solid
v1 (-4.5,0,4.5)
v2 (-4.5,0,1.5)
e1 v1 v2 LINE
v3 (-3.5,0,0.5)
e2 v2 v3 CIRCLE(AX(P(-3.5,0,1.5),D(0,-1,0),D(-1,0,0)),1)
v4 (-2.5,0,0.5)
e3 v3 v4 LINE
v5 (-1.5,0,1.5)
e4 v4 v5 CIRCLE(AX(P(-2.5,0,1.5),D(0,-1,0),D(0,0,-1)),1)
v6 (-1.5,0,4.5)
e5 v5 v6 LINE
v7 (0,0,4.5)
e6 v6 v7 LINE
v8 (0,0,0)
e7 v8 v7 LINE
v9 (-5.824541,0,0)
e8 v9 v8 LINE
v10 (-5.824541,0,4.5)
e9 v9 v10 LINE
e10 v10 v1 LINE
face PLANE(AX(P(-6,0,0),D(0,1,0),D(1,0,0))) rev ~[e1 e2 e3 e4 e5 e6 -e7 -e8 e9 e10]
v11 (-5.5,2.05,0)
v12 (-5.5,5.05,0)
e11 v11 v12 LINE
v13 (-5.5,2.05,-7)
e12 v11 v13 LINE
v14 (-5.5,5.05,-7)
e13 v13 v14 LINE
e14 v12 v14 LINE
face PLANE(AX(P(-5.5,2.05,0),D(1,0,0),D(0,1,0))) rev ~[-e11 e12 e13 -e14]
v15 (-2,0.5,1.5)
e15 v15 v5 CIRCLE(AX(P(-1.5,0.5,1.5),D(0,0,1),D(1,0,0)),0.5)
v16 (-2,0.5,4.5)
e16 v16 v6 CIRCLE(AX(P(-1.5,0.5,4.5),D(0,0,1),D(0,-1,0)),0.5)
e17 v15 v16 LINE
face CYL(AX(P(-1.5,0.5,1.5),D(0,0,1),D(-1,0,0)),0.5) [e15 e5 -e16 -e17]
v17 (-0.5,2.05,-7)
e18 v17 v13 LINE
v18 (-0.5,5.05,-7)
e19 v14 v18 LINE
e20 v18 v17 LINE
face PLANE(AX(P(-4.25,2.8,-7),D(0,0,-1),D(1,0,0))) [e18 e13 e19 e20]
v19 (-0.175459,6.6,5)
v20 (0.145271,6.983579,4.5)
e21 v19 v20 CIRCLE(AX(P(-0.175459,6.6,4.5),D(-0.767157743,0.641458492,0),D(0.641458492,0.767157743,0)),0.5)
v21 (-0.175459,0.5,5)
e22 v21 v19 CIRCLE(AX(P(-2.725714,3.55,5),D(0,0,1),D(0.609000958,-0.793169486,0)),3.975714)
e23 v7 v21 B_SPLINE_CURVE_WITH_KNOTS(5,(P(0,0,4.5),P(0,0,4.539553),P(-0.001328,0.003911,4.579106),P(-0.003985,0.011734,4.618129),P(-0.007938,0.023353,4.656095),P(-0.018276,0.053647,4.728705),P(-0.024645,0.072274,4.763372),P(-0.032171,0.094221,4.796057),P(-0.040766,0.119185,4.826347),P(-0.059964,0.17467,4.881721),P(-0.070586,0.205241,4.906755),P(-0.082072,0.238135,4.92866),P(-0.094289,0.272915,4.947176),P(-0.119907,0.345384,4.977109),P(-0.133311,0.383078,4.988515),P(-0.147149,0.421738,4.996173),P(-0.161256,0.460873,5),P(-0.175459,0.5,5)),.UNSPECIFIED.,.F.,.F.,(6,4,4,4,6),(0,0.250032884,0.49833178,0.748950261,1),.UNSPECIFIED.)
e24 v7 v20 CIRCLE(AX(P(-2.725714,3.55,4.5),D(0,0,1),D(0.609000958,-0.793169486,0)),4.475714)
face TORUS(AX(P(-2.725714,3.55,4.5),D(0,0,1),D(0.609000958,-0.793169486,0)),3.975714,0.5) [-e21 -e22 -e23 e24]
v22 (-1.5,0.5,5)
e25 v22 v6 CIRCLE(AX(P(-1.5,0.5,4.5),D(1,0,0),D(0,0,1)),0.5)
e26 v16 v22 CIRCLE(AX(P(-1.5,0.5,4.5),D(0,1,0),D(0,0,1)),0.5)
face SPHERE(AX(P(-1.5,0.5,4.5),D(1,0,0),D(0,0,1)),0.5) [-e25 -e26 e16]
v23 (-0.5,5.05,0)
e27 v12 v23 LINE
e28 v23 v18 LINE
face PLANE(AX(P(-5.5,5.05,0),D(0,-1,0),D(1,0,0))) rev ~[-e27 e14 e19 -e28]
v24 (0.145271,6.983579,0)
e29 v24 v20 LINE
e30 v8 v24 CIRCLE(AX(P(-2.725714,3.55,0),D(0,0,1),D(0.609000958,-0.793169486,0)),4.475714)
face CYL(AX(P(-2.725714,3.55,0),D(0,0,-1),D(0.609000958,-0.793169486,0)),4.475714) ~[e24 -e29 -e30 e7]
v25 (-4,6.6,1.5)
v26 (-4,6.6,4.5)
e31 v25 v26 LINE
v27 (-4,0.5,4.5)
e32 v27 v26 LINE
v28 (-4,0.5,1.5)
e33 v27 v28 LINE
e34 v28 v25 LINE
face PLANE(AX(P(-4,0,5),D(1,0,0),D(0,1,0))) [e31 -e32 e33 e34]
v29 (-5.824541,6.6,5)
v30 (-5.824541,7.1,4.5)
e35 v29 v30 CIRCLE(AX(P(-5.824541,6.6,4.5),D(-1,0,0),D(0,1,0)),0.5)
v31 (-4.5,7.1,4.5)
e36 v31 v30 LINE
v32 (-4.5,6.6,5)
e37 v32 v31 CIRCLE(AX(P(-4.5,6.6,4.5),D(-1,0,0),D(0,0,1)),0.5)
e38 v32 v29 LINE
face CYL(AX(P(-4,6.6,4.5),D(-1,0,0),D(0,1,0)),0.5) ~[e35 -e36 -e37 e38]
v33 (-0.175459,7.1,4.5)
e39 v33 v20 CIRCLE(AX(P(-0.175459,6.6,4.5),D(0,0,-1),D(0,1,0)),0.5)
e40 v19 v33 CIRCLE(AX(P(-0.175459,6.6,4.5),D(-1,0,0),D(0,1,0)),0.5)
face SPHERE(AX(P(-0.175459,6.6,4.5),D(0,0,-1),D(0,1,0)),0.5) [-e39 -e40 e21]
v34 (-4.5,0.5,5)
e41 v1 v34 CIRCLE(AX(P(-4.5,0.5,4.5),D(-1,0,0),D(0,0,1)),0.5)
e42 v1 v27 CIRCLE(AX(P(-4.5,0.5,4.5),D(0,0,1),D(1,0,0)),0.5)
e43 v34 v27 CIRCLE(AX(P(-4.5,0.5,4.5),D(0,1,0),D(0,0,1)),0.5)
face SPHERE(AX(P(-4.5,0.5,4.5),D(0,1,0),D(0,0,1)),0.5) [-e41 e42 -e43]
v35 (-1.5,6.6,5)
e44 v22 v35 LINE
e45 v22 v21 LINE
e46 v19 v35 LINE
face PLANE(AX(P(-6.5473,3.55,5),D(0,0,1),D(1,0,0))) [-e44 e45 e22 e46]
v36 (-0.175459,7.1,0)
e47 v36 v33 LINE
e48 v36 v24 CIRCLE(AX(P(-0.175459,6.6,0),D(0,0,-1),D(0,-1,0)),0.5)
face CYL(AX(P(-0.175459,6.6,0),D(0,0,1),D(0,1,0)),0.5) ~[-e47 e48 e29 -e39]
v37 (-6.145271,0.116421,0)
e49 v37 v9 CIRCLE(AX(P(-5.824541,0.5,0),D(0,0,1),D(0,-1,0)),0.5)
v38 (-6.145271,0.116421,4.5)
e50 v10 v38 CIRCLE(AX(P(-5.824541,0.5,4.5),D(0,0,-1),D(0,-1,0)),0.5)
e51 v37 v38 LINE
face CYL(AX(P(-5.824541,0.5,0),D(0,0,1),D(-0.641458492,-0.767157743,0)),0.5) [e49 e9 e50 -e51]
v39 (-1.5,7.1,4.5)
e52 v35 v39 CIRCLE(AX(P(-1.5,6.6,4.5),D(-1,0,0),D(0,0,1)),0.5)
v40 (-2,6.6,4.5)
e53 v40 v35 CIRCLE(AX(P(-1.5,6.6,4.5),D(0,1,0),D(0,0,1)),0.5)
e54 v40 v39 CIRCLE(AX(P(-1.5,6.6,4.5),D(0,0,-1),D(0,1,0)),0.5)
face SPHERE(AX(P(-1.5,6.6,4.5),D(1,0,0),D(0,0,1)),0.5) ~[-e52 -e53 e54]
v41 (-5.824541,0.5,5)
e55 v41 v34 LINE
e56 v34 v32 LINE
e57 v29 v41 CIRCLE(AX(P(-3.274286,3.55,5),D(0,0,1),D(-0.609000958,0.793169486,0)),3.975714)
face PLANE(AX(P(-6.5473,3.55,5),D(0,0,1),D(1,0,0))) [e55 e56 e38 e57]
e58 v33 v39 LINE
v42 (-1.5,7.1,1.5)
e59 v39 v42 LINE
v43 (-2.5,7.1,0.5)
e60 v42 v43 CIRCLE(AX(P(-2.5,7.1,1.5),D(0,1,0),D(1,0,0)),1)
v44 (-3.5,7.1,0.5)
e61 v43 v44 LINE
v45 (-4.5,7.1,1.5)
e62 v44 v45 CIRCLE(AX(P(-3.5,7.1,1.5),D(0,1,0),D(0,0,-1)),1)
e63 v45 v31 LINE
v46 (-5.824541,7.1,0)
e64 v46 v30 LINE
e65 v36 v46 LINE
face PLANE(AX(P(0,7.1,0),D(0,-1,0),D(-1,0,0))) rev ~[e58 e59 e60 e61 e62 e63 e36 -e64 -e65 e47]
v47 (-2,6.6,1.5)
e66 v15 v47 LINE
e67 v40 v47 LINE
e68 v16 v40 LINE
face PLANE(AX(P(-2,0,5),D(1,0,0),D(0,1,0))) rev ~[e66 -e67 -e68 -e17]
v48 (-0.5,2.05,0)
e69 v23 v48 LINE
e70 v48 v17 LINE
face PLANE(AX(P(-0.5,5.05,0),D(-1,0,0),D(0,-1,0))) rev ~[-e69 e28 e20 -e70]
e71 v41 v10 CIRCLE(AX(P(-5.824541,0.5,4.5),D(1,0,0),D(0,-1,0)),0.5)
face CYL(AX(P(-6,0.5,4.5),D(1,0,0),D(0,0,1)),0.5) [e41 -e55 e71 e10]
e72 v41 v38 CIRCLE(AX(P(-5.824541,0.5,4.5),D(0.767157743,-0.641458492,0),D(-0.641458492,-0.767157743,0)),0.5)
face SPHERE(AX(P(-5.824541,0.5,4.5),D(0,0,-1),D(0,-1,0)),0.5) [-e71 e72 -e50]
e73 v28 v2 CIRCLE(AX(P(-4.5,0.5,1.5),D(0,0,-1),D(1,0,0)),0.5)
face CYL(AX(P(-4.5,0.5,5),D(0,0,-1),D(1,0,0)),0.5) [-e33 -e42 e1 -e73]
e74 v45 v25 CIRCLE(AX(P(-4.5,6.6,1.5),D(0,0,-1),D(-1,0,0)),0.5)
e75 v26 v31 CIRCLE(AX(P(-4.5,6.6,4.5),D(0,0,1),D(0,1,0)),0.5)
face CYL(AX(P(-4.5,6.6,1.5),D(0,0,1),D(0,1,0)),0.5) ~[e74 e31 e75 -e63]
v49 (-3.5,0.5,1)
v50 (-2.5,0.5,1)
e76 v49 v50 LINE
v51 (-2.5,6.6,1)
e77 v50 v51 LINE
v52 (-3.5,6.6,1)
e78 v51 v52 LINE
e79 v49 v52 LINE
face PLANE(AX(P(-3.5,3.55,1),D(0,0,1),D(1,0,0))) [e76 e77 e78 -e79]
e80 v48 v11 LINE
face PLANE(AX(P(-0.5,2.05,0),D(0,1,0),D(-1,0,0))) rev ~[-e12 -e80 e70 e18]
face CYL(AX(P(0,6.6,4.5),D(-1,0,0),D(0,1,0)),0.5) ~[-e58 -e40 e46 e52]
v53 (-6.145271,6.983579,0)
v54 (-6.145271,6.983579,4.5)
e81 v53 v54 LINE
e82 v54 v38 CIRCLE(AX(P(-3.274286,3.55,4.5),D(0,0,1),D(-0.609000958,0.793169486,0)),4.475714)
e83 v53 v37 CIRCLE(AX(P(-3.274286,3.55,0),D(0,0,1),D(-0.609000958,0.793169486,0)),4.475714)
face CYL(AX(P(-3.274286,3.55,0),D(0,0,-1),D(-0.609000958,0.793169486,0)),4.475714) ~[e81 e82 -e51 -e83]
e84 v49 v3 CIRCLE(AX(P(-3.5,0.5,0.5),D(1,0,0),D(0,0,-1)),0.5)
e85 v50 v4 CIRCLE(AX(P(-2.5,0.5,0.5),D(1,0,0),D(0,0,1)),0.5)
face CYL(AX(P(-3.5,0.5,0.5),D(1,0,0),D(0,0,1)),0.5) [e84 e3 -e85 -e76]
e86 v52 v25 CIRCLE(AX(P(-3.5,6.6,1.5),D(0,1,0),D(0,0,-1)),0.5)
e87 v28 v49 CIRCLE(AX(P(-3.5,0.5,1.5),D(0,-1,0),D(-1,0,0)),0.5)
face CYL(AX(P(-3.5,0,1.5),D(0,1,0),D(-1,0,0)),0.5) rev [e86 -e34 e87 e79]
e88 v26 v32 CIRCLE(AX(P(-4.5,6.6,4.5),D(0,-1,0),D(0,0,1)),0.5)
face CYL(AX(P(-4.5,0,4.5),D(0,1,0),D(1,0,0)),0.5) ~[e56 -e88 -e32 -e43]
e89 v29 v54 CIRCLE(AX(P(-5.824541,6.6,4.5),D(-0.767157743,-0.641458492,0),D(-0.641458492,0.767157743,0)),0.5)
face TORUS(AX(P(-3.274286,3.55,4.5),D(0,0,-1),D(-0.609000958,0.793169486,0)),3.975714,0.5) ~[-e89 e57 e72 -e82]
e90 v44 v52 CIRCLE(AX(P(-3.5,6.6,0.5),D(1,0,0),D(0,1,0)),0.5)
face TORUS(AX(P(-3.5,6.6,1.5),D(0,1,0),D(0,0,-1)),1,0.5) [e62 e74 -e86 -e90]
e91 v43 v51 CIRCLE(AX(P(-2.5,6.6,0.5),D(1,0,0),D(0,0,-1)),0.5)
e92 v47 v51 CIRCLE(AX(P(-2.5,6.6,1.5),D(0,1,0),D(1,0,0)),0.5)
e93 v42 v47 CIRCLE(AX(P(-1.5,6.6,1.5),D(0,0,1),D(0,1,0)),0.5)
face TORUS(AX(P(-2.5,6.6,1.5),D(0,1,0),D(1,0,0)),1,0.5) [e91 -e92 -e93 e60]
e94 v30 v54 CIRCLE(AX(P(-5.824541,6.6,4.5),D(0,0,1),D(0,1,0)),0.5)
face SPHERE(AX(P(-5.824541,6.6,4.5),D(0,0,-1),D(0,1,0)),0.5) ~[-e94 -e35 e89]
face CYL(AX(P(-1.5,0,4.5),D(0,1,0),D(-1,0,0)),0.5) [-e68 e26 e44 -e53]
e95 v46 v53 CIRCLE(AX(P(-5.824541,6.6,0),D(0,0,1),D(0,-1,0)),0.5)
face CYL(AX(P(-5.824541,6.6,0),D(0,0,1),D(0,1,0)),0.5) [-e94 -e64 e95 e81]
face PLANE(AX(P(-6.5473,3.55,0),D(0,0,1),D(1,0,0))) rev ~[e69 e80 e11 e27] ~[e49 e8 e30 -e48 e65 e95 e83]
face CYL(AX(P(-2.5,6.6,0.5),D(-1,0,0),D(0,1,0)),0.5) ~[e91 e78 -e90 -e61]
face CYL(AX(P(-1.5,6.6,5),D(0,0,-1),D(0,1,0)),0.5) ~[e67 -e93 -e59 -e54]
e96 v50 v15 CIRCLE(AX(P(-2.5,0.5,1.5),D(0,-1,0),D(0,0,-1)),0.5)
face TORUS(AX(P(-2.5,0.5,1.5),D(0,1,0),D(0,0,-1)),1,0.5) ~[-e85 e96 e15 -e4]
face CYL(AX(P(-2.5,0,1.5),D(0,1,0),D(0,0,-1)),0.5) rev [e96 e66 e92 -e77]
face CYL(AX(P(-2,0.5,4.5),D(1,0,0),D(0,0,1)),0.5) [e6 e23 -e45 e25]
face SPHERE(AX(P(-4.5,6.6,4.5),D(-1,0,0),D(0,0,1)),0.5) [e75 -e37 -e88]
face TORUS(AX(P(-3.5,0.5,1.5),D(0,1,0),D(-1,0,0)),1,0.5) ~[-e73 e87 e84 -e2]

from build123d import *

# Parameters (mm, degrees)
F1_DEPTH = 5
F2_W     = 1
F2_H     = 7.1
F3_DEPTH = 4
F4_F1_R  = 0.5
F4_F2_R  = 0.5
F5_W     = 2.5
F5_H     = 1.5
F6_DEPTH = 7


with BuildPart() as f1:
    # F0 (on Top) → F1 (new body)
    with BuildSketch(Plane.XY):
        with BuildLine():
            Line((-6, 0), (-6, 7.1))
            ThreePointArc((-6, 7.1), (-7.75, 3.55), (-6, 0))
        make_face()
        Polygon((-3, 7.1), (-6, 7.1), (-6, 0), (-3, 0), (-3, 3.55), align=None)
        Polygon((0, 7.1), (-3, 7.1), (-3, 3.55), (-3, 0), (0, 0), align=None)
        with BuildLine():
            ThreePointArc((0, 0), (1.75, 3.55), (0, 7.1))
            Line((0, 7.1), (0, 0))
        make_face()
    extrude(amount=F1_DEPTH)

    # F2 (on face) → F3 (cut)
    with BuildSketch(Plane.XY.offset(5)):
        with Locations((-3.5, 3.55)):
            Rectangle(F2_W, F2_H)
        with Locations((-2.5, 3.55)):
            Rectangle(F2_W, F2_H)
    extrude(amount=-F3_DEPTH, mode=Mode.SUBTRACT)

    # F4: fillet of radius 0.5 on 15 edges, made by hand

    # F4_f1
    f4_f1_edges = [f1.edges().sort_by_distance(p)[0] for p in [
        (-4, 3.55, 1),
        (-2, 3.55, 1),
    ]]
    fillet(f4_f1_edges, radius=F4_F1_R)

    # F4_f2
    f4_f2_edges = [f1.edges().sort_by_distance(p)[0] for p in [
        (-5, 7.1, 5),
        (-4, 3.55, 5),
        (-5, 0, 5),
        (-7.75, 3.55, 5),
        (-1, 7.1, 5),
        (1.75, 3.55, 5),
        (-1, 0, 5),
        (-2, 3.55, 5),
        (-3, 0, 1),
        (-3, 7.1, 1),
        (0, 7.1, 2.5),
        (-6, 7.1, 2.5),
        (-6, 0, 2.5),
        (-2.1464466094, 7.1, 1.1464466094),
        (-3.8535533906, 7.1, 1.1464466094),
        (-3.8535533906, 0, 1.1464466094),
        (-2.1464466094, 0, 1.1464466094),
    ]]
    fillet(f4_f2_edges, radius=F4_F2_R)

    # F5 (on face) → F6 (join)
    with BuildSketch(Plane(origin=(0, 0, 0), x_dir=(1, 0, 0), z_dir=(0, 0, -1))):
        with Locations((-4.25, -2.8)):
            Rectangle(F5_W, F5_H)
        with Locations((-1.75, -2.8)):
            Rectangle(F5_W, F5_H)
        with Locations((-1.75, -4.3)):
            Rectangle(F5_W, F5_H)
        with Locations((-4.25, -4.3)):
            Rectangle(F5_W, F5_H)
    extrude(amount=F6_DEPTH)


solid = f1.part
